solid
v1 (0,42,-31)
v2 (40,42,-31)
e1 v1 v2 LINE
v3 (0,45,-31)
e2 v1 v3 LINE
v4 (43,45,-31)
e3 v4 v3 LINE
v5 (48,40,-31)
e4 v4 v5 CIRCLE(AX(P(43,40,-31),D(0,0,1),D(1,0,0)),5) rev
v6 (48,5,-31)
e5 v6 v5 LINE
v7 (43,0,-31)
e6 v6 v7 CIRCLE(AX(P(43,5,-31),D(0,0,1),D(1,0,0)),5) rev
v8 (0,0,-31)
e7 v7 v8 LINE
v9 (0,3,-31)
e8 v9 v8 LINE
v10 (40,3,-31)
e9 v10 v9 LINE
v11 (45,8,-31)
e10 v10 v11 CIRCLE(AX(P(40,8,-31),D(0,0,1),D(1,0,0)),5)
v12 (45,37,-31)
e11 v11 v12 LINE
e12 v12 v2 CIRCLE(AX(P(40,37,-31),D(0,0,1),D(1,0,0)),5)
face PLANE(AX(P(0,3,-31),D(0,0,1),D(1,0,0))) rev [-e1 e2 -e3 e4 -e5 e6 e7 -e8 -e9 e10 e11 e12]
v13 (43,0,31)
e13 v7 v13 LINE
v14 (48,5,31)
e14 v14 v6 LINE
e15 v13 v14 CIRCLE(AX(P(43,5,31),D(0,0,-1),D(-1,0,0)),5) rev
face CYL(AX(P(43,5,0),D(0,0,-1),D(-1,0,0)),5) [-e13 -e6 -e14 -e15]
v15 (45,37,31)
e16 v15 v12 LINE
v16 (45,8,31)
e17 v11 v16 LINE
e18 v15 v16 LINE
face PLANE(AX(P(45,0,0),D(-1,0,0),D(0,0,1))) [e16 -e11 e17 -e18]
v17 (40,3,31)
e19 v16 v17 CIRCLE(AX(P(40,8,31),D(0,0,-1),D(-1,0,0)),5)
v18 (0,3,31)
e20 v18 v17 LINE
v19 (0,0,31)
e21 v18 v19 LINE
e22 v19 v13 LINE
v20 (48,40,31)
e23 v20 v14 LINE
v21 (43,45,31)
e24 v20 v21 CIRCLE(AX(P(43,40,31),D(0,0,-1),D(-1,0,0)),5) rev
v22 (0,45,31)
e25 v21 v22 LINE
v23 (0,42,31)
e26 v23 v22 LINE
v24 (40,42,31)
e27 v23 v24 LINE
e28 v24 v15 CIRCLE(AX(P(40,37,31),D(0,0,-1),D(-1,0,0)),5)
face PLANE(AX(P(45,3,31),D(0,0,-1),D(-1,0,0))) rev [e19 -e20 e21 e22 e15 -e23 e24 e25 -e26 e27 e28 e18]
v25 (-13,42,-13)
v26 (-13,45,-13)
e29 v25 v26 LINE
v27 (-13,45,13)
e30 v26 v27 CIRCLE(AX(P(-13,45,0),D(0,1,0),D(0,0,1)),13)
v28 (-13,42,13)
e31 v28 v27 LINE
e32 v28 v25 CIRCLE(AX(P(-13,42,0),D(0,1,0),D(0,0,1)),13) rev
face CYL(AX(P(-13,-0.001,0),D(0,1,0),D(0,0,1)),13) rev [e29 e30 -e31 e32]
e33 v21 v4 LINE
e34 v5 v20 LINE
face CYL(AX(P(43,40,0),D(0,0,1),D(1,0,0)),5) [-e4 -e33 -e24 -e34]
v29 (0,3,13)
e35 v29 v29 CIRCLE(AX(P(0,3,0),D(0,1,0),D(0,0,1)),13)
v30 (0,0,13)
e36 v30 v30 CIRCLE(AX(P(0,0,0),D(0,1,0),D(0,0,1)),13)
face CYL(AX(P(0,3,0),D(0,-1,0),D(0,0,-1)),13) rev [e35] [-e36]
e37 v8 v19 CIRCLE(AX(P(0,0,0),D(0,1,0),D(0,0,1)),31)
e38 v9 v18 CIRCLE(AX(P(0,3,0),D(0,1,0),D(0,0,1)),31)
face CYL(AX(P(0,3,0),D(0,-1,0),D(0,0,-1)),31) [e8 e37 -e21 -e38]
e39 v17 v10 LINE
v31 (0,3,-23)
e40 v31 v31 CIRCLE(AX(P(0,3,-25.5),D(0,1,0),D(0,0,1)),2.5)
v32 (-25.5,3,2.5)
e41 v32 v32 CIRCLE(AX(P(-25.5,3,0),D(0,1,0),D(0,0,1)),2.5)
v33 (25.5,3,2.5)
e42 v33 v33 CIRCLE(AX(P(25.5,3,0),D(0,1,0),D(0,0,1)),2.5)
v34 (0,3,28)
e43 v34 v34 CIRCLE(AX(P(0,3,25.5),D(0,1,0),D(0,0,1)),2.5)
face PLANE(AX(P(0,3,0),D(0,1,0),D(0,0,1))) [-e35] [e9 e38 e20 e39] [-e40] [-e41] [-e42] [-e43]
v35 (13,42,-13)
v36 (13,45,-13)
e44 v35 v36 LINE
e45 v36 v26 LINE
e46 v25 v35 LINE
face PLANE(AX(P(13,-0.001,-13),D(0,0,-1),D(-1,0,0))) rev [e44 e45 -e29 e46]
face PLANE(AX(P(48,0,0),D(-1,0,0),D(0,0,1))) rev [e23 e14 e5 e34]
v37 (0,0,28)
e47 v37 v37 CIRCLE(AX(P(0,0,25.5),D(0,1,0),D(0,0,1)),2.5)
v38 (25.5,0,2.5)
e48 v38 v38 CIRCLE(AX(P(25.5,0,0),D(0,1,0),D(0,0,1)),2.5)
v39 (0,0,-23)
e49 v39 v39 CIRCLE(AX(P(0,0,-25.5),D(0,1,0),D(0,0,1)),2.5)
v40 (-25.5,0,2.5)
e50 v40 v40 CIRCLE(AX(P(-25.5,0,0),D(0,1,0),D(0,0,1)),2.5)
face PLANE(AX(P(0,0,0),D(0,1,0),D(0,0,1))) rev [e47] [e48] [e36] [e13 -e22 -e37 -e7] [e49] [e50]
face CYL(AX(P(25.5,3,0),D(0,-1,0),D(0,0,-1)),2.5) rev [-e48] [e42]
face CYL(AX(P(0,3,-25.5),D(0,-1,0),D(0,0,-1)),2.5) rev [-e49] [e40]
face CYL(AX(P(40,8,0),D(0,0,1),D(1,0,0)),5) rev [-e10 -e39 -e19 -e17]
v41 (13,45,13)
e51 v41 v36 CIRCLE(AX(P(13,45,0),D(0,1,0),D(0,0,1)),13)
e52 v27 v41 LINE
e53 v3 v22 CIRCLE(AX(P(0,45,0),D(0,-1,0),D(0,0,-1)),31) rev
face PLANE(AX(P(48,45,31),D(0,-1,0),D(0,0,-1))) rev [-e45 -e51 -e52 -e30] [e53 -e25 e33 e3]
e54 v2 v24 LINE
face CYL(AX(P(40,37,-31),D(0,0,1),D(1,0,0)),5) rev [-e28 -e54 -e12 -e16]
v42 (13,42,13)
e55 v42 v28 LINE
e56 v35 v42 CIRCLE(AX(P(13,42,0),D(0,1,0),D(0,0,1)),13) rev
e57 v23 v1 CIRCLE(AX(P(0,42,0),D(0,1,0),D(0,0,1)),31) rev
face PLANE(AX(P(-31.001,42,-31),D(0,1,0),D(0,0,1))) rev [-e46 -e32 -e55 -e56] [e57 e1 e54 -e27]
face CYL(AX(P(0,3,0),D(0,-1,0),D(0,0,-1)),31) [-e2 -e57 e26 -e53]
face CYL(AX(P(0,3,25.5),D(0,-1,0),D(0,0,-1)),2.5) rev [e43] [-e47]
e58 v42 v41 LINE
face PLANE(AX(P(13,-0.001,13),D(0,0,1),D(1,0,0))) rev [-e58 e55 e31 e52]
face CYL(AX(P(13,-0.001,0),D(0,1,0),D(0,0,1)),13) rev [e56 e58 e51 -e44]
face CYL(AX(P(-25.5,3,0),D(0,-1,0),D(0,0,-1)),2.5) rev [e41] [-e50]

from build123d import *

# Parameters (mm, degrees)
SKETCH1_R           = 13
SKETCH1_R_2         = 2.5
BOSS_EXTRUDE1_DEPTH = 3
SKETCH2_W           = 62
SKETCH2_H           = 45
BOSS_EXTRUDE2_DEPTH = 3
BOSS_EXTRUDE3_START = 42
BOSS_EXTRUDE3_DEPTH = 3
CUT_EXTRUDE1_REACH  = 74.732
FILLET1_R           = 5


# Read off the part's stored shape, not the designer's step: Boss-Extrude3
with BuildPart() as part:
    # Sketch1 → Boss-Extrude1 (new body)
    with BuildSketch(Plane(origin=(0, 0, 0), x_dir=(1, 0, 0), z_dir=(0, 1, 0))):
        with BuildLine():
            Line((0, 31), (45, 31))
            Line((45, 31), (45, -31))
            Line((45, -31), (0, -31))
            ThreePointArc((0, -31), (-31, 0), (0, 31))
        make_face()
        with Locations(Location((0, 0, 0), (0, 0, 270))):
            Circle(SKETCH1_R, mode=Mode.SUBTRACT)
        with Locations(Location((0, 25.5, 0), (0, 0, 270))):
            Circle(SKETCH1_R_2, mode=Mode.SUBTRACT)
        with Locations(Location((-25.5, 0, 0), (0, 0, 270))):
            Circle(SKETCH1_R_2, mode=Mode.SUBTRACT)
        with Locations(Location((0, -25.5, 0), (0, 0, 270))):
            Circle(SKETCH1_R_2, mode=Mode.SUBTRACT)
        with Locations(Location((25.5, 0, 0), (0, 0, 270))):
            Circle(SKETCH1_R_2, mode=Mode.SUBTRACT)
    extrude(amount=BOSS_EXTRUDE1_DEPTH)

    # Sketch2 → Boss-Extrude2 (add)
    with BuildSketch(Plane(origin=(45, 0, 0), x_dir=(0, 0, -1), z_dir=(1, 0, 0))):
        with Locations((0, 22.5)):
            Rectangle(SKETCH2_W, SKETCH2_H)
    extrude(amount=BOSS_EXTRUDE2_DEPTH)

    # Boss-Extrude3 outline → Boss-Extrude3 (add)
    with BuildSketch(Plane(origin=(0, 0, 0), x_dir=(1, 0, 0), z_dir=(0, 1, 0)).offset(BOSS_EXTRUDE3_START)):
        with BuildLine():
            ThreePointArc((0, 31), (-31, 0), (0, -31))
            Line((0, -31), (45, -31))
            Line((45, -31), (45, 31))
            Line((45, 31), (0, 31))
        make_face()
    extrude(amount=BOSS_EXTRUDE3_DEPTH)

    # Sketch4 → Cut-Extrude1 (cut, up to next)
    with BuildSketch(Plane(origin=(0, 45, 0), x_dir=(1, 0, 0), z_dir=(0, 1, 0)), mode=Mode.PRIVATE) as cut_extrude1_sk1:
        with BuildLine():
            Line((13, -13), (-13, -13))
            ThreePointArc((-13, -13), (-26, 0), (-13, 13))
            Line((-13, 13), (13, 13))
            ThreePointArc((13, 13), (26, 0), (13, -13))
        make_face()
    cut_extrude1_tool1 = extrude(cut_extrude1_sk1.sketch, amount=-CUT_EXTRUDE1_REACH, mode=Mode.PRIVATE) & part.part
    add(cut_extrude1_tool1.solids().sort_by_distance((0, 45, 0))[0], mode=Mode.SUBTRACT)

    # Fillet1
    fillet1_edges = [part.edges().sort_by_distance(p)[0] for p in [
        (45, 3, 0),
        (48, 0, 0),
        (48, 45, 0),
        (45, 42, 0),
    ]]
    fillet(fillet1_edges, radius=FILLET1_R)


solid = part.part
